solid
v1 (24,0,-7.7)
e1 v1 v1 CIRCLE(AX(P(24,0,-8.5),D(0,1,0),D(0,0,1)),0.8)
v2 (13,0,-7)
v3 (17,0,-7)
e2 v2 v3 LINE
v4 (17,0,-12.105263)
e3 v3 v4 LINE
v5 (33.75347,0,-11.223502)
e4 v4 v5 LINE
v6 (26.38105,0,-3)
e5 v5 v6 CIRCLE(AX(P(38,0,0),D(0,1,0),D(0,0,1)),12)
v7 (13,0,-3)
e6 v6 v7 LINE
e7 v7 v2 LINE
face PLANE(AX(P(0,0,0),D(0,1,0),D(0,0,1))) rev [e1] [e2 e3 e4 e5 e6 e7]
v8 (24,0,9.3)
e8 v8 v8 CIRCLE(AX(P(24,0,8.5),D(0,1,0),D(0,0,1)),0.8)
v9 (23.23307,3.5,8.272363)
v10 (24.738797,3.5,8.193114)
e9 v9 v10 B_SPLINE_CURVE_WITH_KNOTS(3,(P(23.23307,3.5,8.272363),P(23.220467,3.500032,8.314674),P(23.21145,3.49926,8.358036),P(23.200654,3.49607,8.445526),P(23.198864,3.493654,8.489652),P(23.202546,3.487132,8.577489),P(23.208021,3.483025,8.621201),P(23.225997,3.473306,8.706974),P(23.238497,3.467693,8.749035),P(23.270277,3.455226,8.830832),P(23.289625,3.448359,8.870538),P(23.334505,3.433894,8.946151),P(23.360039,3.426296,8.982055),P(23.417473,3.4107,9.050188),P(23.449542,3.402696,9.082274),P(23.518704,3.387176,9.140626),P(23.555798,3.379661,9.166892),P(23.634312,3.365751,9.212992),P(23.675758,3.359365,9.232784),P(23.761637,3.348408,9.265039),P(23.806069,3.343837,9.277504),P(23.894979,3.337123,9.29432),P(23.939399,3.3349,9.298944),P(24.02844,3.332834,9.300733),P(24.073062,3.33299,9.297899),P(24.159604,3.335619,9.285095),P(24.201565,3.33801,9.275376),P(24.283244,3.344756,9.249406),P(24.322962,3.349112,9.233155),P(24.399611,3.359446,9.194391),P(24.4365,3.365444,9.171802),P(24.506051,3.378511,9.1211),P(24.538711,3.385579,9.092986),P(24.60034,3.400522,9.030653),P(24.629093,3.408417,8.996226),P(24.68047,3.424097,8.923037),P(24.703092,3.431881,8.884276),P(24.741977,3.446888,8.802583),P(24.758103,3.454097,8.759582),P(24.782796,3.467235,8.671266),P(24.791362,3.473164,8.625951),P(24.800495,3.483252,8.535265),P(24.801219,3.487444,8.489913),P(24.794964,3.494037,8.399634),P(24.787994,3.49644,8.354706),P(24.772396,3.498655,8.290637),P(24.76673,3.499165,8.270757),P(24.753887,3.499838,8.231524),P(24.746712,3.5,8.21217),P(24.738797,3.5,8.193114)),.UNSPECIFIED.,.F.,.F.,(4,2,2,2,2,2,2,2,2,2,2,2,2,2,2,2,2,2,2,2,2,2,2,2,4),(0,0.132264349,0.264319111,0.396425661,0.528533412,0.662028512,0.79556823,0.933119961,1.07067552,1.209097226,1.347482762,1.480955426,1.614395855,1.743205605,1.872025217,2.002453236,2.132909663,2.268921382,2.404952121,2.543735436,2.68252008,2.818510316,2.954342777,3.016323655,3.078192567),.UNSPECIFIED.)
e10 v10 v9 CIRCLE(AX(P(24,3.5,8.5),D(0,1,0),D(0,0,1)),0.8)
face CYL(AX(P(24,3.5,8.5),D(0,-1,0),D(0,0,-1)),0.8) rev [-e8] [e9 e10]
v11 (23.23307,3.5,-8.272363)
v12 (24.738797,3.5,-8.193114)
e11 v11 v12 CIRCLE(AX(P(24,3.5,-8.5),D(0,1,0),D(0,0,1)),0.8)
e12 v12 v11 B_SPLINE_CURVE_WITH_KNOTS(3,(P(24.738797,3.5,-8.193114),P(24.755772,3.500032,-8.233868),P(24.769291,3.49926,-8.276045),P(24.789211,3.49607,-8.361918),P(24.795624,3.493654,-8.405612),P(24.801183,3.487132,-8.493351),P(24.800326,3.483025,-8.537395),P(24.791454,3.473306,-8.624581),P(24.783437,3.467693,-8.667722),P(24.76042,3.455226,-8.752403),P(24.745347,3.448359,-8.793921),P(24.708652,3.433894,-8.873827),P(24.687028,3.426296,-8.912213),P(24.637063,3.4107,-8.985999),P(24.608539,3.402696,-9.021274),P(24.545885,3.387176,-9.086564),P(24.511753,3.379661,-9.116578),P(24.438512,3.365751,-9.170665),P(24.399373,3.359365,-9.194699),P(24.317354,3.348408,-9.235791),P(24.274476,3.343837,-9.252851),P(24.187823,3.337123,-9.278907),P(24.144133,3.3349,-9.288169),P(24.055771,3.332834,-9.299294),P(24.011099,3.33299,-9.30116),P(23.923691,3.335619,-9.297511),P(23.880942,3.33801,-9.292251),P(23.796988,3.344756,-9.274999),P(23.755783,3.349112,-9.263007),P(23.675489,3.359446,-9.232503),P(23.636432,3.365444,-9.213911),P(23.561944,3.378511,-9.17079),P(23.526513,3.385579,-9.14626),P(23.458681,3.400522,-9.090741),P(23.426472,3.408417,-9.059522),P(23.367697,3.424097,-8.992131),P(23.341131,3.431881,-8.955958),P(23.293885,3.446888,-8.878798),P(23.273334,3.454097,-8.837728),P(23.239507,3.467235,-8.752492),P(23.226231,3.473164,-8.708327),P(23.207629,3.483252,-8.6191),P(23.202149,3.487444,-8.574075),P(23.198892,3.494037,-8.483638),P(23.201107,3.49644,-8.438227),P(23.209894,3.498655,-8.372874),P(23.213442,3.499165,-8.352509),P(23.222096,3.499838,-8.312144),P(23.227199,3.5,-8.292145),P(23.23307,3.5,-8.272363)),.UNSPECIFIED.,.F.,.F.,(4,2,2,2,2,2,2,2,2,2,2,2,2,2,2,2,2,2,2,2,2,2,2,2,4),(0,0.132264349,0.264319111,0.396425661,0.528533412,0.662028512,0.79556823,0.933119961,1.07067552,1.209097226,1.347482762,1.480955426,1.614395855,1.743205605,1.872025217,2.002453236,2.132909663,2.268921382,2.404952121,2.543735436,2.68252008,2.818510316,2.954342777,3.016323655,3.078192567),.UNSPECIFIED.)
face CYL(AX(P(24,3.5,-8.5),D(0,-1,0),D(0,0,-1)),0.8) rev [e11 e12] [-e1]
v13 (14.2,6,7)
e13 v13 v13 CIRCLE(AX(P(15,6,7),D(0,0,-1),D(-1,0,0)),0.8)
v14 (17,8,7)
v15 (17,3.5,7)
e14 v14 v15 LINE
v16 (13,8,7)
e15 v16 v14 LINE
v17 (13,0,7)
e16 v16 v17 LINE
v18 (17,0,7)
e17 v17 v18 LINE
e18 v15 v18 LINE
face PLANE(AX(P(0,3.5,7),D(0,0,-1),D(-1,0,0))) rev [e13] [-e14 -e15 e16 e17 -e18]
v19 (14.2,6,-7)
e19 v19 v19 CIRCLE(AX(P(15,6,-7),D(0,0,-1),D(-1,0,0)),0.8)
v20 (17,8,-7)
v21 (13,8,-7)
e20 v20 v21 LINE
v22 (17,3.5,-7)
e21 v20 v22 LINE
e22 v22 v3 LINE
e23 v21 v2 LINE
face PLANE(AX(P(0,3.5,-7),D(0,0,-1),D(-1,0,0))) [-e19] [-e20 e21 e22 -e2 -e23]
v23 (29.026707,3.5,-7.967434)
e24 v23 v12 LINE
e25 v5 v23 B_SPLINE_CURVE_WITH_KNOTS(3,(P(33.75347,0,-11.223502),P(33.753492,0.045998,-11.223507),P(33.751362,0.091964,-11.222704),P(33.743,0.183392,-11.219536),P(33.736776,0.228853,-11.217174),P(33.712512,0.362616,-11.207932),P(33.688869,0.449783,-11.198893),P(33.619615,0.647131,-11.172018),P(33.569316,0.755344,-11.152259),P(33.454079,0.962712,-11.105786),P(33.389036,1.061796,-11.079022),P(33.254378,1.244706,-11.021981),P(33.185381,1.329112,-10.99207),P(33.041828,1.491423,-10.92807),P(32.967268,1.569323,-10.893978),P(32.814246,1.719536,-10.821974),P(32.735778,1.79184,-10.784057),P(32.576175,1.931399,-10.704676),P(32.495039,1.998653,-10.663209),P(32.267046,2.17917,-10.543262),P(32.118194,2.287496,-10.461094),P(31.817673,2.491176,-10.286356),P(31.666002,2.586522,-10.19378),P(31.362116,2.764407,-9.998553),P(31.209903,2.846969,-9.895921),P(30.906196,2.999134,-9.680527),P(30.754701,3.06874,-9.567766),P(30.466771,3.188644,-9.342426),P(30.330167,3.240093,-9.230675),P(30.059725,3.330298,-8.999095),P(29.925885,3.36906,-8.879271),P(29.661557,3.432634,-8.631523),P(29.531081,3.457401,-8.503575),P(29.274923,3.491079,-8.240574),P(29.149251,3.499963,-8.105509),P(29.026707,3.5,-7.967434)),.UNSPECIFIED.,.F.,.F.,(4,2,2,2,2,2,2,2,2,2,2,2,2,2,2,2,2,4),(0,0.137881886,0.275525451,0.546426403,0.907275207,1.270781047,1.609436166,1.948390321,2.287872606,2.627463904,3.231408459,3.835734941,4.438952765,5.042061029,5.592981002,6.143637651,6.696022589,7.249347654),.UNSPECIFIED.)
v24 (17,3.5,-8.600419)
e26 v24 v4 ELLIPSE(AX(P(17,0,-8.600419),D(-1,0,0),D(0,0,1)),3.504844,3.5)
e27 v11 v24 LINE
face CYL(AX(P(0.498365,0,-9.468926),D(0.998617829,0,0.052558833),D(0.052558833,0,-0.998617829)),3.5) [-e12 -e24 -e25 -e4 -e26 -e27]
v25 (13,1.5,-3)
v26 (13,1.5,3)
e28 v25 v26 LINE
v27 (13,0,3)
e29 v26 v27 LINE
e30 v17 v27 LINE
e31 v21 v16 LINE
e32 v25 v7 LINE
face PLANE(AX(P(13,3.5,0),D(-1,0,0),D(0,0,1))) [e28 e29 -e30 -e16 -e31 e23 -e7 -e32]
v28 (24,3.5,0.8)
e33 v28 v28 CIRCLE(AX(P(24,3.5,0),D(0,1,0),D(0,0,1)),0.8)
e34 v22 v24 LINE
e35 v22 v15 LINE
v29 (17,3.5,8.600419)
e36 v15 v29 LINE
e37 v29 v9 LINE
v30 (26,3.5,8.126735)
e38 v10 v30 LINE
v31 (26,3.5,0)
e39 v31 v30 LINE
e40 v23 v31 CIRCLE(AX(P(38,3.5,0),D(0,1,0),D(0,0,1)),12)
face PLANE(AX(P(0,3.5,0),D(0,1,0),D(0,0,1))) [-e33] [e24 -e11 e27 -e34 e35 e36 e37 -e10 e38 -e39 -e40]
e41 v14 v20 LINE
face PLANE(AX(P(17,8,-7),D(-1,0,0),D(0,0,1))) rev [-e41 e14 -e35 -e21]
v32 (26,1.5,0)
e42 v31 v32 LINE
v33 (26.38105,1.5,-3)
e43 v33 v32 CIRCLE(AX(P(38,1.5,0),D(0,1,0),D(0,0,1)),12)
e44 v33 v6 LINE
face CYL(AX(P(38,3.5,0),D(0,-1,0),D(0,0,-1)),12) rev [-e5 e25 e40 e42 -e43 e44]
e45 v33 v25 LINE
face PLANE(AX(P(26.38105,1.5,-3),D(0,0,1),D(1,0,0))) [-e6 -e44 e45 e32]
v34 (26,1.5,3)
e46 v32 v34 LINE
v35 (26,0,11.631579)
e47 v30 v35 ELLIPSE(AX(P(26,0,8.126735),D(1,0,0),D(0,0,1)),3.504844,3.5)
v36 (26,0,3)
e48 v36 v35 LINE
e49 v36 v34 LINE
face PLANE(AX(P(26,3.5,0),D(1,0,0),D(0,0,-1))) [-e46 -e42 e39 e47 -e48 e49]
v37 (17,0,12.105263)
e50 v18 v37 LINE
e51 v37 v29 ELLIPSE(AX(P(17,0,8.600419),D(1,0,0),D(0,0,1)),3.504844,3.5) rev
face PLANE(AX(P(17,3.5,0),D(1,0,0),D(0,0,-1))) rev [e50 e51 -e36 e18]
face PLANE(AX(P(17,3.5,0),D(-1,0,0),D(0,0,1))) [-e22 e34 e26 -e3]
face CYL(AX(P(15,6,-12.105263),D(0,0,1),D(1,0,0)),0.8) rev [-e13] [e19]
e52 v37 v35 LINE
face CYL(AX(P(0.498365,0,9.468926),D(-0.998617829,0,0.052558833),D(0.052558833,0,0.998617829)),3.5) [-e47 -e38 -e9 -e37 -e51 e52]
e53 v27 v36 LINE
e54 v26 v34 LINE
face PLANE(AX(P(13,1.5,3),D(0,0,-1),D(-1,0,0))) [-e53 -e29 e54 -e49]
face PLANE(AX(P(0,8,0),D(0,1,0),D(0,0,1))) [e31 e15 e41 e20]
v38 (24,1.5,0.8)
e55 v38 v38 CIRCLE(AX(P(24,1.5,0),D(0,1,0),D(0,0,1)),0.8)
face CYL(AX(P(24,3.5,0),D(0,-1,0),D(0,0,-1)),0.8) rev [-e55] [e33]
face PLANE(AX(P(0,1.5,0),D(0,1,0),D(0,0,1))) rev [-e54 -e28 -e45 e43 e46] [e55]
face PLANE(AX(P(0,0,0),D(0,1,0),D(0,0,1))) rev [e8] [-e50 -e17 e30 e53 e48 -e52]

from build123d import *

# Parameters (mm, degrees)
BOSS_EXTRUDE1_DEPTH = 3.5
SKETCH2_R           = 0.8
SCREW_HOLES_DEPTH   = 37.028935124
SKETCH3_W           = 4
SKETCH3_H           = 14
BOSS_EXTRUDE2_DEPTH = 8
WIRE_CANAL_DEPTH    = 1.5
CUT_EXTRUDE2_START  = 13
SKETCH5_R           = 0.8
CUT_EXTRUDE2_DEPTH  = 50.74008936
FILLET1_R           = 3.5


with BuildPart() as part:
    # Sketch1 → Boss-Extrude1 (new body)
    with BuildSketch(Plane(origin=(0, 0, 0), x_dir=(1, 0, 0), z_dir=(0, 1, 0))):
        with BuildLine():
            Line((17, -10), (17, -12.105263158))
            Line((17, -12.105263158), (26, -11.631578947))
            Line((26, -11.631578947), (26, 0))
            ThreePointArc((26, 0), (28.126845638, 6.820617489), (33.753470489, 11.223501553))
            Line((33.753470489, 11.223501553), (17, 12.105263158))
            Line((17, 12.105263158), (17, 10))
            Line((17, 10), (17, 7))
            Line((17, 7), (13, 7))
            Line((13, 7), (13, 0))
            Line((13, 0), (13, -7))
            Line((13, -7), (17, -7))
            Line((17, -7), (17, -10))
        make_face()
    extrude(amount=BOSS_EXTRUDE1_DEPTH)

    # Sketch2 → Screw Holes (cut, through all)
    with BuildSketch(Plane(origin=(0, 0, 0), x_dir=(1, 0, 0), z_dir=(0, 1, 0))):
        with Locations(Location((24, 8.5, 0), (0, 0, 270))):
            Circle(SKETCH2_R)
        with Locations(Location((24, 0, 0), (0, 0, 270))):
            Circle(SKETCH2_R)
        with Locations(Location((24, -8.5, 0), (0, 0, 270))):
            Circle(SKETCH2_R)
    extrude(amount=SCREW_HOLES_DEPTH, mode=Mode.SUBTRACT)

    # Sketch3 → Boss-Extrude2 (add)
    with BuildSketch(Plane(origin=(0, 0, 0), x_dir=(1, 0, 0), z_dir=(0, 1, 0))):
        with Locations((15, 0)):
            Rectangle(SKETCH3_W, SKETCH3_H)
    extrude(amount=BOSS_EXTRUDE2_DEPTH)

    # Sketch4 → Wire Canal (cut)
    with BuildSketch(Plane(origin=(0, 0, 0), x_dir=(1, 0, 0), z_dir=(0, 1, 0))):
        Polygon((13, 0), (13, 3), (26.381049961, 3), (26.381049961, -3), (13, -3), align=None)
    extrude(amount=WIRE_CANAL_DEPTH, mode=Mode.SUBTRACT)

    # Sketch5 → Cut-Extrude2 (cut, through all)
    with BuildSketch(Plane.XY.offset(CUT_EXTRUDE2_START)):
        with Locations(Location((15, 6, 0), (0, 0, 180))):
            Circle(SKETCH5_R)
    extrude(amount=-CUT_EXTRUDE2_DEPTH, mode=Mode.SUBTRACT)

    # Fillet1
    # the kernel refuses this fillet: 3.5 mm, written as the material it takes off along each edge
    with BuildSketch(Plane(origin=(8.262093993, 3.5, 12.565152948), x_dir=(0, -1, 0), z_dir=(0.9986178293325098, 0, -0.05255883312276359))) as fillet1_piece_1:
        with BuildLine():
            CenterArc((FILLET1_R, FILLET1_R), FILLET1_R, 180, 90)
            Line((0, FILLET1_R), (0, 0))
            Line((0, 0), (FILLET1_R, 0))
        make_face()
    extrude(amount=26.512456753, mode=Mode.SUBTRACT)
    with BuildSketch(Plane(origin=(42.491376496, 3.5, -10.763611763), x_dir=(-0.05255883312276374, 0, 0.9986178293325098), z_dir=(-0.9986178293325098, 0, -0.05255883312276374))) as fillet1_piece_2:
        with BuildLine():
            CenterArc((FILLET1_R, -FILLET1_R), FILLET1_R, 90, 90)
            Line((0, -FILLET1_R), (0, 0))
            Line((0, 0), (FILLET1_R, 0))
        make_face()
    extrude(amount=34.276658695, mode=Mode.SUBTRACT)


solid = part.part
